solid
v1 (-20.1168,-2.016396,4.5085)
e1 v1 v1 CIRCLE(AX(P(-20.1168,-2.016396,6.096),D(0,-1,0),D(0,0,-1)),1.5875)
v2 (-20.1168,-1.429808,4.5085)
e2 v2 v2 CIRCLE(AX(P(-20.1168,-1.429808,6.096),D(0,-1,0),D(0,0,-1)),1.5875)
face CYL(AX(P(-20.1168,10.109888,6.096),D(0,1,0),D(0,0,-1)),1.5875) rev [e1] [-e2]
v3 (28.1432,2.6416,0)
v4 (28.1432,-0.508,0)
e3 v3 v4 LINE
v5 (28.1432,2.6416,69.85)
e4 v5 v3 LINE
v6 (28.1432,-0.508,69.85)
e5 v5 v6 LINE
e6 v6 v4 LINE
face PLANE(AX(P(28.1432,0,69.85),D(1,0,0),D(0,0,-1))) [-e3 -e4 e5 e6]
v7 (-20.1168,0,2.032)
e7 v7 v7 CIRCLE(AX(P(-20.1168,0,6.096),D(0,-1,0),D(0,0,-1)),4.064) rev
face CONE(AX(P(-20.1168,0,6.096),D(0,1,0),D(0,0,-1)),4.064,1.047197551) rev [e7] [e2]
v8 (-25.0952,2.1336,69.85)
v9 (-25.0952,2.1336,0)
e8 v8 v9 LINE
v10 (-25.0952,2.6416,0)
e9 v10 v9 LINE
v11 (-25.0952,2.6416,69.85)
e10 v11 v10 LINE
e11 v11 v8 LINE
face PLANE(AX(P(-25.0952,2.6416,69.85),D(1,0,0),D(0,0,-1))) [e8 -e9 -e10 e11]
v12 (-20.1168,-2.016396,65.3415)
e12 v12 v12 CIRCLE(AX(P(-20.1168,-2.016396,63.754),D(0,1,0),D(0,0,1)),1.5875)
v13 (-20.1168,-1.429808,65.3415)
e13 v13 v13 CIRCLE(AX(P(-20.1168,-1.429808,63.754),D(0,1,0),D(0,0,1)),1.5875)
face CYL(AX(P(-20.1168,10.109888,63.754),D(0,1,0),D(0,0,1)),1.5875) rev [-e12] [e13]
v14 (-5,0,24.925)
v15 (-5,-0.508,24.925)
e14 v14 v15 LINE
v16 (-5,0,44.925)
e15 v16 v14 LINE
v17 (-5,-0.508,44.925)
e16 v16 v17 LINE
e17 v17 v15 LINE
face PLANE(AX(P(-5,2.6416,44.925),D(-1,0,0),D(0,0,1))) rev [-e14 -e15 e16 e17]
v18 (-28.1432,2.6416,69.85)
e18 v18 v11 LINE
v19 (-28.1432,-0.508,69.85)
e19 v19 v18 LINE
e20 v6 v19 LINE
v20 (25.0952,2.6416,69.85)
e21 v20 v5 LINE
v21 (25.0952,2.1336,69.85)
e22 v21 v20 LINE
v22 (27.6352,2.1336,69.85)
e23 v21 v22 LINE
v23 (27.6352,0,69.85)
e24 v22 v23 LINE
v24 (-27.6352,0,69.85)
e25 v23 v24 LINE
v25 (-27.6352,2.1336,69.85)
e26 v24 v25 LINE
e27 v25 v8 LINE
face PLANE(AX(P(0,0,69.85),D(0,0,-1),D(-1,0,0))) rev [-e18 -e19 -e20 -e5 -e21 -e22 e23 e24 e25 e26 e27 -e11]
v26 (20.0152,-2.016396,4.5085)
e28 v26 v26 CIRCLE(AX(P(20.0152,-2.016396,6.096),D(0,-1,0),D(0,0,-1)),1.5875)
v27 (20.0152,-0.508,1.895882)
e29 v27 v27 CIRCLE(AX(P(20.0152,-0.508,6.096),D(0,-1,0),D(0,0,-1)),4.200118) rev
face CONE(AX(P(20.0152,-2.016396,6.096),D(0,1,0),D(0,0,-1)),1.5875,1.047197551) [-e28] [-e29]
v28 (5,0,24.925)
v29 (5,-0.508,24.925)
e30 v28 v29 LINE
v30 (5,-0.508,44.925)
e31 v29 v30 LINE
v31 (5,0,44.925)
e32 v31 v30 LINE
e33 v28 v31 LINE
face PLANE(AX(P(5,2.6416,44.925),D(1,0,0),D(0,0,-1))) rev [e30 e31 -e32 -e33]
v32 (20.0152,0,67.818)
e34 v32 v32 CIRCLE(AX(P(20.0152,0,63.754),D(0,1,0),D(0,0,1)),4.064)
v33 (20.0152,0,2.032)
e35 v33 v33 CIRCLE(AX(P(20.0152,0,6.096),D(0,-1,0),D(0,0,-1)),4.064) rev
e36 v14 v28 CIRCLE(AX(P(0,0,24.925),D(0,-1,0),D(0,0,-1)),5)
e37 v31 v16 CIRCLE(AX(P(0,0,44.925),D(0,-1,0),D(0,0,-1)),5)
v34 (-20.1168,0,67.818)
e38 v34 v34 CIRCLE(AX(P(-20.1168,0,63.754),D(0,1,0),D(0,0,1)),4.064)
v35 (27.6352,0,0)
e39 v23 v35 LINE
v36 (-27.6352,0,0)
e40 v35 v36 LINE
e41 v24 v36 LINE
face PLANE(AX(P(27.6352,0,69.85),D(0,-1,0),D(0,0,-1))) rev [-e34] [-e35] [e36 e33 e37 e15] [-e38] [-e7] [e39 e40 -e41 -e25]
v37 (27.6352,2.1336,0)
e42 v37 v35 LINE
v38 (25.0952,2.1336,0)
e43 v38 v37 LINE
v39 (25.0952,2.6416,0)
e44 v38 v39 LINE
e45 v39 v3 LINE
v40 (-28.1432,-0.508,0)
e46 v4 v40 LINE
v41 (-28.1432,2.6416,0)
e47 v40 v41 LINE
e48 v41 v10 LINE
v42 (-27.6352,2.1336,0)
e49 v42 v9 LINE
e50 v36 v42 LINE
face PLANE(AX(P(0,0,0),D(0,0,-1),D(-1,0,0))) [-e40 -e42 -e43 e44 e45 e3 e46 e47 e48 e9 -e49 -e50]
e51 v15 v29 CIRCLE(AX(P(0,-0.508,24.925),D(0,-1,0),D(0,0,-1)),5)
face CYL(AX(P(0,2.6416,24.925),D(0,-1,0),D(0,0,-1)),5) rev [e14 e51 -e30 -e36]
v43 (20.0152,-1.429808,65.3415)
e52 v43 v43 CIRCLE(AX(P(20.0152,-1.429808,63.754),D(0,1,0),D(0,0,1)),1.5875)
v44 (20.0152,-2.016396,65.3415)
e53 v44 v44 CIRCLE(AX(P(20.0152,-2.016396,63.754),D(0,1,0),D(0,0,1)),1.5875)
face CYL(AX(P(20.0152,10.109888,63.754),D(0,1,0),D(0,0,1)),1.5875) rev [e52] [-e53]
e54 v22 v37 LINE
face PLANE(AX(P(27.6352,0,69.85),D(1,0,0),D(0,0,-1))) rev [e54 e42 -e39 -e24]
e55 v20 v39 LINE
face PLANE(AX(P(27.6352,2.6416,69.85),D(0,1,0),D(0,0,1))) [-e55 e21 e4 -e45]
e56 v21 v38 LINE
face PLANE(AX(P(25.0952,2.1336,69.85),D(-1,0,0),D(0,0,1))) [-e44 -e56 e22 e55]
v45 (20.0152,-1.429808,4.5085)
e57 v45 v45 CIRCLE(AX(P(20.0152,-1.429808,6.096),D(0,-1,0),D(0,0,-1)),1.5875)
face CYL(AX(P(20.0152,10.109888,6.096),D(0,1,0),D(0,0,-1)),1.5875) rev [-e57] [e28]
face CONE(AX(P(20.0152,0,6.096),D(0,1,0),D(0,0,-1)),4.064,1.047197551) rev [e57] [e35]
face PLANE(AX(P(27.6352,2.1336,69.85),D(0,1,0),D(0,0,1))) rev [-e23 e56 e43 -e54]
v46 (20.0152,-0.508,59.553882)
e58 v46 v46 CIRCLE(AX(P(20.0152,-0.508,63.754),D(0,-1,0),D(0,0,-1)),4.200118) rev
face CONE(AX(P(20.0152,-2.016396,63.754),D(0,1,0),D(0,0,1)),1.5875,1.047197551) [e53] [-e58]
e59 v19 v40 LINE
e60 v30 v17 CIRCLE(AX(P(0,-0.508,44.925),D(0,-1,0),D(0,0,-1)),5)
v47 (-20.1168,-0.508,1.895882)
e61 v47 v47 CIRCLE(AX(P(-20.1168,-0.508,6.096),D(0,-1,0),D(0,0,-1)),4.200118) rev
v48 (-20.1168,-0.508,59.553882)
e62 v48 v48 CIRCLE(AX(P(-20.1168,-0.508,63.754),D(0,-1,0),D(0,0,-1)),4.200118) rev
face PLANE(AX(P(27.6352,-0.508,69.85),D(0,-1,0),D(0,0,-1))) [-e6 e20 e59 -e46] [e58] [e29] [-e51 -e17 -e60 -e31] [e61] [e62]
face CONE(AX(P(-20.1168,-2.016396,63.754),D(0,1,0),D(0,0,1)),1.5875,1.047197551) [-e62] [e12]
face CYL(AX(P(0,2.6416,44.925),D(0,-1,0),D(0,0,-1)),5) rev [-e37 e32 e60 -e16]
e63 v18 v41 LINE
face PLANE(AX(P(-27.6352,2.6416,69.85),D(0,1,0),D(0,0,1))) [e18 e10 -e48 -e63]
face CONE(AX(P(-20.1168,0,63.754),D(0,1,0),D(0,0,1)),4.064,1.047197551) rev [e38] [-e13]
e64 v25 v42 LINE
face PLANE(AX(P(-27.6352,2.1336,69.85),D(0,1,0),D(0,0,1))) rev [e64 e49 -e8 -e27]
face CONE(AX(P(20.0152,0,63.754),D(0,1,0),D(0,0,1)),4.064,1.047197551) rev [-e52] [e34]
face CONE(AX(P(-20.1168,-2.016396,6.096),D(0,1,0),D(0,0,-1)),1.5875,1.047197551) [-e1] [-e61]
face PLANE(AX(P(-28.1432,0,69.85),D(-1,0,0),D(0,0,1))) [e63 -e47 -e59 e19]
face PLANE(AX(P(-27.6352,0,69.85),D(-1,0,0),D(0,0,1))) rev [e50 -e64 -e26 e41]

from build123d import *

# Parameters (mm, degrees)
EXTRUDE_THIN3_DEPTH     = 69.85
CUT_EXTRUDE1_DEPTH      = 76.372290574
CUT_EXTRUDE1_DEPTH_BACK = 76.372290574
SKETCH9_R               = 4.064
CUT_EXTRUDE2_DEPTH      = 2.54
LPATTERN1_COUNT         = 2
LPATTERN1_PITCH         = 40.132


# Read off the part's stored shape, not the designer's step: Mirror1
with BuildPart() as part:
    # Sketch6 → Extrude-Thin3 (new body)
    with BuildSketch(Plane.XY):
        Polygon((25.0952, 2.1336), (27.6352, 2.1336), (27.6352, 0), (-27.6352, 0), (-27.6352, 2.1336), (-25.0952, 2.1336), (-25.0952, 2.6416), (-28.1432, 2.6416), (-28.1432, -0.508), (28.1432, -0.508), (28.1432, 2.6416), (25.0952, 2.6416), align=None)
    extrude(amount=EXTRUDE_THIN3_DEPTH)

    # Sketch8 → Cut-Extrude1 (cut, two sides: drawn at the far end of the back side and taken through both)
    with BuildSketch(Plane.XZ.offset(0.508).offset(-CUT_EXTRUDE1_DEPTH_BACK)):
        with BuildLine():
            Line((5, 44.925), (5, 24.925))
            ThreePointArc((5, 24.925), (0, 19.925), (-5, 24.925))
            Line((-5, 24.925), (-5, 44.925))
            ThreePointArc((-5, 44.925), (0, 49.925), (5, 44.925))
        make_face()
    extrude(amount=CUT_EXTRUDE1_DEPTH + CUT_EXTRUDE1_DEPTH_BACK, mode=Mode.SUBTRACT)

    # Sketch9 → Cut-Extrude2 (cut)
    with BuildSketch(Plane.XZ.offset(0.508)):
        with Locations(Location((20.0152, 63.754, 0), (0, 0, 270))):
            Circle(SKETCH9_R)
    cut_extrude2 = extrude(amount=-CUT_EXTRUDE2_DEPTH, mode=Mode.SUBTRACT)

    # Sketch10 → Revolve1 (revolve)
    with BuildSketch(Plane(origin=(0, 0, 63.754), x_dir=(0, -1, 0), z_dir=(0, 0, 1)), mode=Mode.PRIVATE) as revolve1_sk:
        Polygon((0, 24.0792), (1.429807942, 21.6027), (2.016395815, 21.6027), (0, 25.0952), align=None)
    revolve1 = revolve(revolve1_sk.sketch.rotate(Axis((20.0152, 10.109887768, 63.754), (0, -1, 0)), 90), axis=Axis((20.0152, 10.109887768, 63.754), (0, -1, 0)))

    # LPattern1: Cut-Extrude2, Revolve1 ×2
    with Locations(*[(-i * LPATTERN1_PITCH, 0, 0) for i in range(1, LPATTERN1_COUNT)]):
        add(cut_extrude2, mode=Mode.SUBTRACT)
        add(revolve1)

    # Mirror1 outline → Mirror1 (revolve)
    with BuildSketch(Plane(origin=(20.0152, 0, 6.096), x_dir=(1, 0, 0), z_dir=(0, 0, 1))):
        Polygon((3.18411819, -0.508), (1.5875, -1.429807942), (1.5875, -2.016395815), (4.20011819, -0.508), align=None)
    revolve(axis=Axis((20.0152, 0, 6.096), (0, 1, 0)))

    # Mirror1 2 outline → Mirror1 2 (revolve)
    with BuildSketch(Plane(origin=(-20.1168, 0, 6.096), x_dir=(1, 0, 0), z_dir=(0, 0, 1))):
        Polygon((3.18411819, -0.508), (1.5875, -1.429807942), (1.5875, -2.016395815), (4.20011819, -0.508), align=None)
    revolve(axis=Axis((-20.1168, 0, 6.096), (0, 1, 0)))

    # Mirror1 3 outline → Mirror1 3 (revolve, cut)
    with BuildSketch(Plane(origin=(20.0152, 0, 6.096), x_dir=(1, 0, 0), z_dir=(0, 0, 1))):
        Polygon((3.18411819, -0.508), (4.064, 0), (0, 0), (0, -0.508), align=None)
    revolve(axis=Axis((20.0152, 0, 6.096), (0, 1, 0)), mode=Mode.SUBTRACT)

    # Mirror1 4 outline → Mirror1 4 (revolve, cut)
    with BuildSketch(Plane(origin=(-20.1168, 0, 6.096), x_dir=(1, 0, 0), z_dir=(0, 0, 1))):
        Polygon((3.18411819, -0.508), (4.064, 0), (0, 0), (0, -0.508), align=None)
    revolve(axis=Axis((-20.1168, 0, 6.096), (0, 1, 0)), mode=Mode.SUBTRACT)


solid = part.part
